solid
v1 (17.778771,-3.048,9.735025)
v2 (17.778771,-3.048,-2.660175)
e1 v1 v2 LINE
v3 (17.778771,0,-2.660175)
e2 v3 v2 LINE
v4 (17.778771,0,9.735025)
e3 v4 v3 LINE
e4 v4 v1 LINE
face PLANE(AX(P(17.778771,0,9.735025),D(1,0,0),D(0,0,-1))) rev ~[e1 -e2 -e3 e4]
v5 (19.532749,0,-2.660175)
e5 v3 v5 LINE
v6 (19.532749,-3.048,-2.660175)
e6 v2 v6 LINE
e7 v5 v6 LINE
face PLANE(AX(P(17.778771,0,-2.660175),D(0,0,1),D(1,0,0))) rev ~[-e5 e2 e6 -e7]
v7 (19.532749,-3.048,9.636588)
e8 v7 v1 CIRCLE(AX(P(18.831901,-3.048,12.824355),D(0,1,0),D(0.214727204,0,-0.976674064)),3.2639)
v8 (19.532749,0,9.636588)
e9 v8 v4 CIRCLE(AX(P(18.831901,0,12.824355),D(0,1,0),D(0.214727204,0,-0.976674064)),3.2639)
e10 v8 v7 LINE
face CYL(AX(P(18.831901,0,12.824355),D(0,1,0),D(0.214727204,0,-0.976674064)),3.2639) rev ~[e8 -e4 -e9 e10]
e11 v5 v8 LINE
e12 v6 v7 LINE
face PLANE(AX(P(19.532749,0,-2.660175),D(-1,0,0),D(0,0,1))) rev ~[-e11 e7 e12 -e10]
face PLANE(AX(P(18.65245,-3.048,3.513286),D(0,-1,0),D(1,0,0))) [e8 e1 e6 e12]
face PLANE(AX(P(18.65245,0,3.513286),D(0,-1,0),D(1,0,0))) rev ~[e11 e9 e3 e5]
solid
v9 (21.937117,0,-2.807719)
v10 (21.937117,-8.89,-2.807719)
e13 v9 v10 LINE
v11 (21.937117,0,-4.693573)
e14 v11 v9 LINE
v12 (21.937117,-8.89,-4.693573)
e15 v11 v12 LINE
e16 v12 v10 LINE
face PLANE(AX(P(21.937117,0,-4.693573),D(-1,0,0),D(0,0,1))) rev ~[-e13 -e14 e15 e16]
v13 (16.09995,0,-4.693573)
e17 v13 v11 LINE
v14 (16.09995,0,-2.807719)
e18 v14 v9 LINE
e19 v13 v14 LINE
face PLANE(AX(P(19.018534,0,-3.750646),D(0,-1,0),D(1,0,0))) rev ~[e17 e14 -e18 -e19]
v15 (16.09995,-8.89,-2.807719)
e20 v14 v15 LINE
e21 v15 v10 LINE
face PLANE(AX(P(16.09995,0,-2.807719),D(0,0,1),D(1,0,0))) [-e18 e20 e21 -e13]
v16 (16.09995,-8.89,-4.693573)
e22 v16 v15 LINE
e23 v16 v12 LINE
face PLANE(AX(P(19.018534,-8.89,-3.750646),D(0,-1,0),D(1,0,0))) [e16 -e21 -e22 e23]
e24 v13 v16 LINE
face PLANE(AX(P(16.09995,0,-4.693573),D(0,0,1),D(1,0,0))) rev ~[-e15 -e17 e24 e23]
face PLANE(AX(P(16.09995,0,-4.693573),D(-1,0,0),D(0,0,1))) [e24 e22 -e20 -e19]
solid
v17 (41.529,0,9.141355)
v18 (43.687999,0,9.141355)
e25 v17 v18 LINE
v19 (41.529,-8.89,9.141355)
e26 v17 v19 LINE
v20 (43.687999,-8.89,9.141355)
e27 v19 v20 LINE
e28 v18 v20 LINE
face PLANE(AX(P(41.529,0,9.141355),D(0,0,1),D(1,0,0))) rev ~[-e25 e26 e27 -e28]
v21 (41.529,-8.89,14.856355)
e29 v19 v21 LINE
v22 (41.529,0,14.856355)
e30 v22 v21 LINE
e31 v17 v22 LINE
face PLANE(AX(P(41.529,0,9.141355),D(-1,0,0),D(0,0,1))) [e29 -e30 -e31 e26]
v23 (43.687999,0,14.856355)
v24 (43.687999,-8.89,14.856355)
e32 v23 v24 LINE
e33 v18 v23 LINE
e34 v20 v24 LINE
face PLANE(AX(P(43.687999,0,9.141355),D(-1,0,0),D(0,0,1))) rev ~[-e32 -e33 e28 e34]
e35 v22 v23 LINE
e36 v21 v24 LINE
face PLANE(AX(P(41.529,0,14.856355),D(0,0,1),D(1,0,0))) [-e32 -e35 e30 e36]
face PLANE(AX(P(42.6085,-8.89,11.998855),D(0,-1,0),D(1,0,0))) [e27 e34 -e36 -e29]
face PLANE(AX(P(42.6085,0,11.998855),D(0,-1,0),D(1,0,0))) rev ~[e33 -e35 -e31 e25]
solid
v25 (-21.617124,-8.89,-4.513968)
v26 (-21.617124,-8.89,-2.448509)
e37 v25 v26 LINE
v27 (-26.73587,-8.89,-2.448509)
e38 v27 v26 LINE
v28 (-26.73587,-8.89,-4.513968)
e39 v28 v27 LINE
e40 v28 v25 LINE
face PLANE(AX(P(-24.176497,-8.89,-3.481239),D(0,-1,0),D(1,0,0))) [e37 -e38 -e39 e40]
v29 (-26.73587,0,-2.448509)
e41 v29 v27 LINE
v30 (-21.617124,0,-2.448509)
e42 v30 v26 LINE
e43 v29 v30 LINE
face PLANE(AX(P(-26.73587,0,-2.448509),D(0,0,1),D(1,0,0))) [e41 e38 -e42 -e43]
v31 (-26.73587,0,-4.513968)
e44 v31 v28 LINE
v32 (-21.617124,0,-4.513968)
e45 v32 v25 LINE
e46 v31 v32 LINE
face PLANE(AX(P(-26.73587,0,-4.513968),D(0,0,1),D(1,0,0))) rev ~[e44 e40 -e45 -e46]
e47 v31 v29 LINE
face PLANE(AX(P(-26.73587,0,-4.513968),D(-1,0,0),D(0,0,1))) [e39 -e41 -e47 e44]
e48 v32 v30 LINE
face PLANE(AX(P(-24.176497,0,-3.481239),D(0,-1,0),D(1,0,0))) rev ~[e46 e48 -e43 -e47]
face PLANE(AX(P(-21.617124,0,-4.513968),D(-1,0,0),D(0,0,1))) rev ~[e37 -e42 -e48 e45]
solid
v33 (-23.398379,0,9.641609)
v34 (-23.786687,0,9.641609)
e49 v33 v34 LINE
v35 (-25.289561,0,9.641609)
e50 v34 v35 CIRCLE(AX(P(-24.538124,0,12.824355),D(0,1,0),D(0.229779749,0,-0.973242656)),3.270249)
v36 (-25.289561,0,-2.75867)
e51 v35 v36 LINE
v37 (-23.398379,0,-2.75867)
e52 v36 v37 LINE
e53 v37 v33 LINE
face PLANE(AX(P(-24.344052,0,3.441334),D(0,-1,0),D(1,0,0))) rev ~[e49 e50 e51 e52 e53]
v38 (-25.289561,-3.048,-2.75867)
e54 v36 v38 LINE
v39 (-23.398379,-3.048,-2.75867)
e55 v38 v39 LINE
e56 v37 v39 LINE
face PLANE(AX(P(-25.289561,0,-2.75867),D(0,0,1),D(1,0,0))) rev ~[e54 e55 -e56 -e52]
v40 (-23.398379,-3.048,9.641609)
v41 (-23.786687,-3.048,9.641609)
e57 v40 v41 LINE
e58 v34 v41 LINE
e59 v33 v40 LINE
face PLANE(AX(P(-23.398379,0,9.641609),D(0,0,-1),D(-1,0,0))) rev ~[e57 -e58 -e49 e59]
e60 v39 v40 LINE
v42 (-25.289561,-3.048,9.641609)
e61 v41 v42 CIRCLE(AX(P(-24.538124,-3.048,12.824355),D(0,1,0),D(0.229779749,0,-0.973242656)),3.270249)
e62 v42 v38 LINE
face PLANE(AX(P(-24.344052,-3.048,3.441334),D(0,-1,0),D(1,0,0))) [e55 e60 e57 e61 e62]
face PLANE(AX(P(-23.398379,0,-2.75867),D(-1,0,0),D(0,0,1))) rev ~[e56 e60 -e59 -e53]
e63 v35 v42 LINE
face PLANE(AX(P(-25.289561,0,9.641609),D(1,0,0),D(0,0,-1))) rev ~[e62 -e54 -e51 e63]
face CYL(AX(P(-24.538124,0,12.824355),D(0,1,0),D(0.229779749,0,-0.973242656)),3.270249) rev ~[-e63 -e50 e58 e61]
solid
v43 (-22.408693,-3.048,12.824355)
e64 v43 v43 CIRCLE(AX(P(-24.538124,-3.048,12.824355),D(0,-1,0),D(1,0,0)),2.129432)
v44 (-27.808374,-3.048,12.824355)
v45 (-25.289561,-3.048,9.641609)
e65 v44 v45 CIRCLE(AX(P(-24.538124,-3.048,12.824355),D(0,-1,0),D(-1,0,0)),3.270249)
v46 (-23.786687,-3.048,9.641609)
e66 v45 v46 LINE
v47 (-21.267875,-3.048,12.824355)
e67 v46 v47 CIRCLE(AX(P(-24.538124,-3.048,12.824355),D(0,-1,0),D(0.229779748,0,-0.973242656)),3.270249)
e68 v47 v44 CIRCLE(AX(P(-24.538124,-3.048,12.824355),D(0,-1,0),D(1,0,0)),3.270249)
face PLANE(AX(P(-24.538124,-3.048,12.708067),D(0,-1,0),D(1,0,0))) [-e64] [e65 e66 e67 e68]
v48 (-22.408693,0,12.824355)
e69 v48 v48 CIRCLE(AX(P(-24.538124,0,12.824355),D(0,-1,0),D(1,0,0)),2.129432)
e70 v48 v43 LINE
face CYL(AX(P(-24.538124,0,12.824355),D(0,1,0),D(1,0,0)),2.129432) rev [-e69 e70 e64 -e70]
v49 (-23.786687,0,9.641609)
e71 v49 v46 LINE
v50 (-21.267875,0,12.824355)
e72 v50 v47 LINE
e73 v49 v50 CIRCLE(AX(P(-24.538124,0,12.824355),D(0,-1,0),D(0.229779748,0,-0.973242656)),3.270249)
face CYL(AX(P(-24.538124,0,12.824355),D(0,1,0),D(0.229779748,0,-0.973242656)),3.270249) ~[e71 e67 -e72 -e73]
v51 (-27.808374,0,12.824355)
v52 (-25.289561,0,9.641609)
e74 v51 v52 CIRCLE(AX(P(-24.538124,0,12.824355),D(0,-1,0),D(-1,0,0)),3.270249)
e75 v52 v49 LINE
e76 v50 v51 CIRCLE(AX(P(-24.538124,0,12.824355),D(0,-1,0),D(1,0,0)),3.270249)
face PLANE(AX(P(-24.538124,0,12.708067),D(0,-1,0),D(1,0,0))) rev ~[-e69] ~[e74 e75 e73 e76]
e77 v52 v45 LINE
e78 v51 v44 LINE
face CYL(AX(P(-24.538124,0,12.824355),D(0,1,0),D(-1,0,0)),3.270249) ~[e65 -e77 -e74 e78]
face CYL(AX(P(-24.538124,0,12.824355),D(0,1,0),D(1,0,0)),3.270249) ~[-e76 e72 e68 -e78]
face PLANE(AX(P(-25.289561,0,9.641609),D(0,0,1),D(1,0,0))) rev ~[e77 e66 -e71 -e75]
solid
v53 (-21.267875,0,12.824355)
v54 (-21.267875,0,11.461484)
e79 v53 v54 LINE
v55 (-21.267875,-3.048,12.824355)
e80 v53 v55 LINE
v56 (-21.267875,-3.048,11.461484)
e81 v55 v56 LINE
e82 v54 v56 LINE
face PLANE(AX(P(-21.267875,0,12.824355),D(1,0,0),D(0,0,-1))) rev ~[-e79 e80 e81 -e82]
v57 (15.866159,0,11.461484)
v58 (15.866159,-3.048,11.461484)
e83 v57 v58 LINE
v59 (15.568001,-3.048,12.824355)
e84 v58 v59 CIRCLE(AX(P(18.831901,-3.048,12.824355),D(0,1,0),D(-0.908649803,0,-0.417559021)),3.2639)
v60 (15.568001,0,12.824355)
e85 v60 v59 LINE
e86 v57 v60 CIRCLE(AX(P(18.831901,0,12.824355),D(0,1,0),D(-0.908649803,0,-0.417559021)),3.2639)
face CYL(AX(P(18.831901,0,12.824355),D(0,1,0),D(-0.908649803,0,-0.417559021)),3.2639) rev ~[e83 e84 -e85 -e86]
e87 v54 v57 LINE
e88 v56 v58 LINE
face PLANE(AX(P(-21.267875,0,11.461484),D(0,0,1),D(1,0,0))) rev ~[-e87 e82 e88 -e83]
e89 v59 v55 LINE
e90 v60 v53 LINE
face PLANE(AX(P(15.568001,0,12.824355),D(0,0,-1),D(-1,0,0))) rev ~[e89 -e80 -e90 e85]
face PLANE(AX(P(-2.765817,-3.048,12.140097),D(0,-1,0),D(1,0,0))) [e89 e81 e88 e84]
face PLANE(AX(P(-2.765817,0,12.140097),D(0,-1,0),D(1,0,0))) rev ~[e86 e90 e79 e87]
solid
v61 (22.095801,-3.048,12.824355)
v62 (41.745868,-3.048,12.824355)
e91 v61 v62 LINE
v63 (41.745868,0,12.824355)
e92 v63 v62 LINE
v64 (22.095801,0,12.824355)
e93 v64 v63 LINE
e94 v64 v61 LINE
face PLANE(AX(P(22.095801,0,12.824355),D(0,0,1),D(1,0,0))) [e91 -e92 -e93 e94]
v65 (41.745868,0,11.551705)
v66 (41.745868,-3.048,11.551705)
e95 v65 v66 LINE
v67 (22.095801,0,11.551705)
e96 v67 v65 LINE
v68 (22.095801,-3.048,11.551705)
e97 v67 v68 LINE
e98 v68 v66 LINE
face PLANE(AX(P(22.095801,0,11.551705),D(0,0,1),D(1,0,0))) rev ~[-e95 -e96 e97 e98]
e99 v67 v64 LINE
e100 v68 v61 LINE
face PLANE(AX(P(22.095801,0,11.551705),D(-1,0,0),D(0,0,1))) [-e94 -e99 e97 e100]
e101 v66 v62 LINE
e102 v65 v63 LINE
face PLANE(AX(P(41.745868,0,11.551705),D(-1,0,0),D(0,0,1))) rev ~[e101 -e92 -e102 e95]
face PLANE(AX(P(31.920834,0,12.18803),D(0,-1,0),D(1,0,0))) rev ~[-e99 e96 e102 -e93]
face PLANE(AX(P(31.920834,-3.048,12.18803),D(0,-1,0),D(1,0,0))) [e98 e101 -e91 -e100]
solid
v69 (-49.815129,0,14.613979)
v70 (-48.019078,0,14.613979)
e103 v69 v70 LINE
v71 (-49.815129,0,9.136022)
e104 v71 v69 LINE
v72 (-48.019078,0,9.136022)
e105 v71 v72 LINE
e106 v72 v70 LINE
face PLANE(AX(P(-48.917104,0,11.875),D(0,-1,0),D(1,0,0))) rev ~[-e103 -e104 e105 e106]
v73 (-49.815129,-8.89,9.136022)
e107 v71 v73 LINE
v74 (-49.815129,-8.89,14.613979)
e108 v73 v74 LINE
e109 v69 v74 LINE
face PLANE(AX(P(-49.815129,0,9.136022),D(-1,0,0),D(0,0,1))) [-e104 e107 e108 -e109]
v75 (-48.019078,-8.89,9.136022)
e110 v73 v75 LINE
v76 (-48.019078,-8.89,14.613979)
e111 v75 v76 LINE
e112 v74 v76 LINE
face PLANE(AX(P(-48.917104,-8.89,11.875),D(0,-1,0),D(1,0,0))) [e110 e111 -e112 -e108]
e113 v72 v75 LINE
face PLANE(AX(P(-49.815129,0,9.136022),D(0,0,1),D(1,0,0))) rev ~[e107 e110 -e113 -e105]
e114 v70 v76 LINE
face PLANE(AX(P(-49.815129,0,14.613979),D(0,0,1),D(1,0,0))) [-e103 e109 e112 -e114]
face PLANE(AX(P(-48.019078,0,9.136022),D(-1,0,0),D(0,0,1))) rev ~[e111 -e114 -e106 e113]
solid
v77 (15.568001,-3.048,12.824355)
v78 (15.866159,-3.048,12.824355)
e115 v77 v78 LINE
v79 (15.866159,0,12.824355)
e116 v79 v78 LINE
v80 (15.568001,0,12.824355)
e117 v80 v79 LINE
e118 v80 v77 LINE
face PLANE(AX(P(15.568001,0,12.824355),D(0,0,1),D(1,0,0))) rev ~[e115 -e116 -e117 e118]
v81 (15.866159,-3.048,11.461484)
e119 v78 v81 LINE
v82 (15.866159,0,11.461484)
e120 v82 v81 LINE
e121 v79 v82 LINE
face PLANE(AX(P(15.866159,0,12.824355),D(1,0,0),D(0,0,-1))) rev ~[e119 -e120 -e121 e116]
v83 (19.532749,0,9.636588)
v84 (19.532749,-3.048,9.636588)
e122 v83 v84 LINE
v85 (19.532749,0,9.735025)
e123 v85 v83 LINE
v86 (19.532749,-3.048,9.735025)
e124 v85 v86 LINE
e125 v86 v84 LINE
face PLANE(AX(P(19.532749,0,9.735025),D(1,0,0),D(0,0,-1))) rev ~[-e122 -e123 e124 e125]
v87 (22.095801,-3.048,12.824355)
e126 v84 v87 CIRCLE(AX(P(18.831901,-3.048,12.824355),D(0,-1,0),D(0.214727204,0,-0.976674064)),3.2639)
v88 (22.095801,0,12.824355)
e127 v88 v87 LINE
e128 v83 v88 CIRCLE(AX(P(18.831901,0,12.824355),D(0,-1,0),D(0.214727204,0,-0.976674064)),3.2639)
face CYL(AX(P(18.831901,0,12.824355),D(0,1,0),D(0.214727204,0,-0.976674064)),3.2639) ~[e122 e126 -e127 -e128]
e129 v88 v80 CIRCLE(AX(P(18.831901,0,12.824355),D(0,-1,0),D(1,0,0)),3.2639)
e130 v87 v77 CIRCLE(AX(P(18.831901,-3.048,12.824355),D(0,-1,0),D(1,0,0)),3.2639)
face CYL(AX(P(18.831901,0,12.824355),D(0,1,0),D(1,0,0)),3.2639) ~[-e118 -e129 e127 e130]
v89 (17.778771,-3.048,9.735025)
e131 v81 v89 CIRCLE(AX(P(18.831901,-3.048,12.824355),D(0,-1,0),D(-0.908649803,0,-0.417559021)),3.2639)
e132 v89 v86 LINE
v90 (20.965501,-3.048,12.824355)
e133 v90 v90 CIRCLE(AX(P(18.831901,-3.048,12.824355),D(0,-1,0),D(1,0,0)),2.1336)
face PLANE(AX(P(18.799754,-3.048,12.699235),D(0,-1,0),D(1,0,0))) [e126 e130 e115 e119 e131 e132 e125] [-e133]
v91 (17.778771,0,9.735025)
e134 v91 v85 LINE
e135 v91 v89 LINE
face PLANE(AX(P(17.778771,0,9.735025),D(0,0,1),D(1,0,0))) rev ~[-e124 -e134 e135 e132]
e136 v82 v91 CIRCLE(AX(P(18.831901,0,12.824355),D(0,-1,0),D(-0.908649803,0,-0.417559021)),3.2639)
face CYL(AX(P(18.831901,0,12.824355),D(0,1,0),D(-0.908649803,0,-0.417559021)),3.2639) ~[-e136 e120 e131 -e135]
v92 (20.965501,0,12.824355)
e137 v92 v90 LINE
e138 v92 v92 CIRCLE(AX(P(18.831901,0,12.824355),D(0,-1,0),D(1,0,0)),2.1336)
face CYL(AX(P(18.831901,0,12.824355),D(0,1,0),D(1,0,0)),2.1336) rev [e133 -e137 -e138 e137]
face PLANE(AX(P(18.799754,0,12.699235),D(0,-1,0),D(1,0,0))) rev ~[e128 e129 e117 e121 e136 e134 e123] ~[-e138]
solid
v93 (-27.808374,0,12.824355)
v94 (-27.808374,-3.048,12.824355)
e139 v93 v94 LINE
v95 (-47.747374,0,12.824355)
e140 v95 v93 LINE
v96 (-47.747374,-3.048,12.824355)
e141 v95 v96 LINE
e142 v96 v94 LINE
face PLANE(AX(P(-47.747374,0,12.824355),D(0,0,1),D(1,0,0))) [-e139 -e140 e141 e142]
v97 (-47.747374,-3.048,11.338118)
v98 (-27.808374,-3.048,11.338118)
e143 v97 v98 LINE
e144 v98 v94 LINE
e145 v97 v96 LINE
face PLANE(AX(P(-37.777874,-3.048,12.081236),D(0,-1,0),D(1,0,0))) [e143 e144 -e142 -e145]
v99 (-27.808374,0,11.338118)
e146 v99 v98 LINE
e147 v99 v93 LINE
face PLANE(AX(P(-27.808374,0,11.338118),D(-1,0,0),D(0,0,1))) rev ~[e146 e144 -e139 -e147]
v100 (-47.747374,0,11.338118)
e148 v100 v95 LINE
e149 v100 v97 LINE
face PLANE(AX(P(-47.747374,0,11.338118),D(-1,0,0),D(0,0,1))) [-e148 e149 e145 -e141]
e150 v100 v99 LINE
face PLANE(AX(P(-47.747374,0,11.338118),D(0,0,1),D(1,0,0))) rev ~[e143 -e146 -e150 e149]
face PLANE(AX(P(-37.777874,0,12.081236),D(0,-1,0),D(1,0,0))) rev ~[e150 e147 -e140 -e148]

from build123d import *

# Parameters (mm, degrees)
F0_W     = 19.6500662714
F0_H     = 1.2726495042
F1_DEPTH = 3.048
F0_R     = 2.1336
F0_R_2   = 2.1294315388
F0_W_2   = 19.939
F0_H_2   = 1.4862371609
F2_W     = 1.7960518599
F2_H     = 5.4779564962
F3_DEPTH = 8.89
F2_W_2   = 5.1187463105
F2_H_2   = 2.0654590335
F2_W_3   = 5.8371666819
F2_H_3   = 1.8858539406
F2_W_4   = 2.1589994431
F2_H_4   = 5.7150004432


with BuildPart() as f1:
    # F0 (on Front) → F1 (new body)
    with BuildSketch(Plane.XZ):
        with Locations((31.9208344445, 12.1880299412)):
            Rectangle(F0_W, F0_H)
    extrude(amount=F1_DEPTH)


with BuildPart() as f1b:
    # F0 (on Front) → F1, piece 2 (new body)
    with BuildSketch(Plane.XZ):
        with BuildLine():
            ThreePointArc((22.0958013088, 12.8243546933), (18.8319013088, 16.0882546933), (15.5680013088, 12.8243546933))
            Line((15.5680013088, 12.8243546933), (15.8661592174, 12.8243546933))
            Line((15.8661592174, 12.8243546933), (15.8661592174, 11.4614838053))
            ThreePointArc((15.8661592174, 11.4614838053), (16.6448945696, 10.4015371738), (17.778771361, 9.7350245842))
            Line((17.778771361, 9.7350245842), (19.5327494293, 9.7350245842))
            Line((19.5327494293, 9.7350245842), (19.5327494293, 9.6365882147))
            ThreePointArc((19.5327494293, 9.6365882147), (21.3755739873, 10.7791719351), (22.0958013088, 12.8243546933))
        make_face()
        with Locations((18.8319013088, 12.8243546933)):
            Circle(F0_R, mode=Mode.SUBTRACT)
    extrude(amount=F1_DEPTH)


with BuildPart() as f1c:
    # F0 (on Front) → F1, piece 3 (new body)
    with BuildSketch(Plane.XZ):
        with BuildLine():
            Line((15.5680013088, 12.8243546933), (-21.2678752836, 12.8243546933))
            Line((-21.2678752836, 12.8243546933), (-21.2678752836, 11.4614838053))
            Line((-21.2678752836, 11.4614838053), (15.8661592174, 11.4614838053))
            ThreePointArc((15.8661592174, 11.4614838053), (15.6434119468, 12.1268026888), (15.5680013088, 12.8243546933))
        make_face()
    extrude(amount=F1_DEPTH)


with BuildPart() as f1d:
    # F0 (on Front) → F1, piece 4 (new body)
    with BuildSketch(Plane.XZ):
        with BuildLine():
            ThreePointArc((-23.7866874056, 9.6416087265), (-21.9737613738, 10.7949282722), (-21.2678752836, 12.8243546933))
            ThreePointArc((-21.2678752836, 12.8243546933), (-24.5381244323, 16.0946038419), (-27.8083735809, 12.8243546933))
            ThreePointArc((-27.8083735809, 12.8243546933), (-27.1024874907, 10.7949282722), (-25.2895614589, 9.6416087265))
            Line((-25.2895614589, 9.6416087265), (-23.7866874056, 9.6416087265))
        make_face()
        with Locations((-24.5381244323, 12.8243546933)):
            Circle(F0_R_2, mode=Mode.SUBTRACT)
    extrude(amount=F1_DEPTH)


with BuildPart() as f1e:
    # F0 (on Front) → F1, piece 5 (new body)
    with BuildSketch(Plane.XZ):
        with Locations((-37.7778735809, 12.0812361129)):
            Rectangle(F0_W_2, F0_H_2)
    extrude(amount=F1_DEPTH)


with BuildPart() as f1f:
    # F0 (on Front) → F1, piece 6 (new body)
    with BuildSketch(Plane.XZ):
        with BuildLine():
            Line((-23.3983788639, 9.6416087265), (-23.7866874056, 9.6416087265))
            ThreePointArc((-23.7866874056, 9.6416087265), (-24.5381244323, 9.5541055446), (-25.2895614589, 9.6416087265))
            Line((-25.2895614589, 9.6416087265), (-25.2895614589, -2.7586696669))
            Line((-25.2895614589, -2.7586696669), (-23.3983788639, -2.7586696669))
            Line((-23.3983788639, -2.7586696669), (-23.3983788639, 9.6416087265))
        make_face()
    extrude(amount=F1_DEPTH)


with BuildPart() as f1g:
    # F0 (on Front) → F1, piece 7 (new body)
    with BuildSketch(Plane.XZ):
        with BuildLine():
            Line((19.5327494293, -2.6601754158), (19.5327494293, 9.6365882147))
            ThreePointArc((19.5327494293, 9.6365882147), (18.6490132251, 9.5655826609), (17.778771361, 9.7350245842))
            Line((17.778771361, 9.7350245842), (17.778771361, -2.6601754158))
            Line((17.778771361, -2.6601754158), (19.5327494293, -2.6601754158))
        make_face()
    extrude(amount=F1_DEPTH)


with BuildPart() as f3:
    # F2 (on Front) → F3 (new body)
    with BuildSketch(Plane.XZ):
        with Locations((-48.9171035588, 11.8750003166)):
            Rectangle(F2_W, F2_H)
    extrude(amount=F3_DEPTH)


with BuildPart() as f3b:
    # F2 (on Front) → F3, piece 2 (new body)
    with BuildSketch(Plane.XZ):
        with Locations((-24.1764970124, -3.4812387312)):
            Rectangle(F2_W_2, F2_H_2)
    extrude(amount=F3_DEPTH)


with BuildPart() as f3c:
    # F2 (on Front) → F3, piece 3 (new body)
    with BuildSketch(Plane.XZ):
        with Locations((19.0185336396, -3.7506463705)):
            Rectangle(F2_W_3, F2_H_3)
    extrude(amount=F3_DEPTH)


with BuildPart() as f3d:
    # F2 (on Front) → F3, piece 4 (new body)
    with BuildSketch(Plane.XZ):
        with Locations((42.608499527, 11.9988550432)):
            Rectangle(F2_W_4, F2_H_4)
    extrude(amount=F3_DEPTH)


solid = Compound([f1.part, f1b.part, f1c.part, f1d.part, f1e.part, f1f.part, f1g.part, f3.part, f3b.part, f3c.part, f3d.part])
